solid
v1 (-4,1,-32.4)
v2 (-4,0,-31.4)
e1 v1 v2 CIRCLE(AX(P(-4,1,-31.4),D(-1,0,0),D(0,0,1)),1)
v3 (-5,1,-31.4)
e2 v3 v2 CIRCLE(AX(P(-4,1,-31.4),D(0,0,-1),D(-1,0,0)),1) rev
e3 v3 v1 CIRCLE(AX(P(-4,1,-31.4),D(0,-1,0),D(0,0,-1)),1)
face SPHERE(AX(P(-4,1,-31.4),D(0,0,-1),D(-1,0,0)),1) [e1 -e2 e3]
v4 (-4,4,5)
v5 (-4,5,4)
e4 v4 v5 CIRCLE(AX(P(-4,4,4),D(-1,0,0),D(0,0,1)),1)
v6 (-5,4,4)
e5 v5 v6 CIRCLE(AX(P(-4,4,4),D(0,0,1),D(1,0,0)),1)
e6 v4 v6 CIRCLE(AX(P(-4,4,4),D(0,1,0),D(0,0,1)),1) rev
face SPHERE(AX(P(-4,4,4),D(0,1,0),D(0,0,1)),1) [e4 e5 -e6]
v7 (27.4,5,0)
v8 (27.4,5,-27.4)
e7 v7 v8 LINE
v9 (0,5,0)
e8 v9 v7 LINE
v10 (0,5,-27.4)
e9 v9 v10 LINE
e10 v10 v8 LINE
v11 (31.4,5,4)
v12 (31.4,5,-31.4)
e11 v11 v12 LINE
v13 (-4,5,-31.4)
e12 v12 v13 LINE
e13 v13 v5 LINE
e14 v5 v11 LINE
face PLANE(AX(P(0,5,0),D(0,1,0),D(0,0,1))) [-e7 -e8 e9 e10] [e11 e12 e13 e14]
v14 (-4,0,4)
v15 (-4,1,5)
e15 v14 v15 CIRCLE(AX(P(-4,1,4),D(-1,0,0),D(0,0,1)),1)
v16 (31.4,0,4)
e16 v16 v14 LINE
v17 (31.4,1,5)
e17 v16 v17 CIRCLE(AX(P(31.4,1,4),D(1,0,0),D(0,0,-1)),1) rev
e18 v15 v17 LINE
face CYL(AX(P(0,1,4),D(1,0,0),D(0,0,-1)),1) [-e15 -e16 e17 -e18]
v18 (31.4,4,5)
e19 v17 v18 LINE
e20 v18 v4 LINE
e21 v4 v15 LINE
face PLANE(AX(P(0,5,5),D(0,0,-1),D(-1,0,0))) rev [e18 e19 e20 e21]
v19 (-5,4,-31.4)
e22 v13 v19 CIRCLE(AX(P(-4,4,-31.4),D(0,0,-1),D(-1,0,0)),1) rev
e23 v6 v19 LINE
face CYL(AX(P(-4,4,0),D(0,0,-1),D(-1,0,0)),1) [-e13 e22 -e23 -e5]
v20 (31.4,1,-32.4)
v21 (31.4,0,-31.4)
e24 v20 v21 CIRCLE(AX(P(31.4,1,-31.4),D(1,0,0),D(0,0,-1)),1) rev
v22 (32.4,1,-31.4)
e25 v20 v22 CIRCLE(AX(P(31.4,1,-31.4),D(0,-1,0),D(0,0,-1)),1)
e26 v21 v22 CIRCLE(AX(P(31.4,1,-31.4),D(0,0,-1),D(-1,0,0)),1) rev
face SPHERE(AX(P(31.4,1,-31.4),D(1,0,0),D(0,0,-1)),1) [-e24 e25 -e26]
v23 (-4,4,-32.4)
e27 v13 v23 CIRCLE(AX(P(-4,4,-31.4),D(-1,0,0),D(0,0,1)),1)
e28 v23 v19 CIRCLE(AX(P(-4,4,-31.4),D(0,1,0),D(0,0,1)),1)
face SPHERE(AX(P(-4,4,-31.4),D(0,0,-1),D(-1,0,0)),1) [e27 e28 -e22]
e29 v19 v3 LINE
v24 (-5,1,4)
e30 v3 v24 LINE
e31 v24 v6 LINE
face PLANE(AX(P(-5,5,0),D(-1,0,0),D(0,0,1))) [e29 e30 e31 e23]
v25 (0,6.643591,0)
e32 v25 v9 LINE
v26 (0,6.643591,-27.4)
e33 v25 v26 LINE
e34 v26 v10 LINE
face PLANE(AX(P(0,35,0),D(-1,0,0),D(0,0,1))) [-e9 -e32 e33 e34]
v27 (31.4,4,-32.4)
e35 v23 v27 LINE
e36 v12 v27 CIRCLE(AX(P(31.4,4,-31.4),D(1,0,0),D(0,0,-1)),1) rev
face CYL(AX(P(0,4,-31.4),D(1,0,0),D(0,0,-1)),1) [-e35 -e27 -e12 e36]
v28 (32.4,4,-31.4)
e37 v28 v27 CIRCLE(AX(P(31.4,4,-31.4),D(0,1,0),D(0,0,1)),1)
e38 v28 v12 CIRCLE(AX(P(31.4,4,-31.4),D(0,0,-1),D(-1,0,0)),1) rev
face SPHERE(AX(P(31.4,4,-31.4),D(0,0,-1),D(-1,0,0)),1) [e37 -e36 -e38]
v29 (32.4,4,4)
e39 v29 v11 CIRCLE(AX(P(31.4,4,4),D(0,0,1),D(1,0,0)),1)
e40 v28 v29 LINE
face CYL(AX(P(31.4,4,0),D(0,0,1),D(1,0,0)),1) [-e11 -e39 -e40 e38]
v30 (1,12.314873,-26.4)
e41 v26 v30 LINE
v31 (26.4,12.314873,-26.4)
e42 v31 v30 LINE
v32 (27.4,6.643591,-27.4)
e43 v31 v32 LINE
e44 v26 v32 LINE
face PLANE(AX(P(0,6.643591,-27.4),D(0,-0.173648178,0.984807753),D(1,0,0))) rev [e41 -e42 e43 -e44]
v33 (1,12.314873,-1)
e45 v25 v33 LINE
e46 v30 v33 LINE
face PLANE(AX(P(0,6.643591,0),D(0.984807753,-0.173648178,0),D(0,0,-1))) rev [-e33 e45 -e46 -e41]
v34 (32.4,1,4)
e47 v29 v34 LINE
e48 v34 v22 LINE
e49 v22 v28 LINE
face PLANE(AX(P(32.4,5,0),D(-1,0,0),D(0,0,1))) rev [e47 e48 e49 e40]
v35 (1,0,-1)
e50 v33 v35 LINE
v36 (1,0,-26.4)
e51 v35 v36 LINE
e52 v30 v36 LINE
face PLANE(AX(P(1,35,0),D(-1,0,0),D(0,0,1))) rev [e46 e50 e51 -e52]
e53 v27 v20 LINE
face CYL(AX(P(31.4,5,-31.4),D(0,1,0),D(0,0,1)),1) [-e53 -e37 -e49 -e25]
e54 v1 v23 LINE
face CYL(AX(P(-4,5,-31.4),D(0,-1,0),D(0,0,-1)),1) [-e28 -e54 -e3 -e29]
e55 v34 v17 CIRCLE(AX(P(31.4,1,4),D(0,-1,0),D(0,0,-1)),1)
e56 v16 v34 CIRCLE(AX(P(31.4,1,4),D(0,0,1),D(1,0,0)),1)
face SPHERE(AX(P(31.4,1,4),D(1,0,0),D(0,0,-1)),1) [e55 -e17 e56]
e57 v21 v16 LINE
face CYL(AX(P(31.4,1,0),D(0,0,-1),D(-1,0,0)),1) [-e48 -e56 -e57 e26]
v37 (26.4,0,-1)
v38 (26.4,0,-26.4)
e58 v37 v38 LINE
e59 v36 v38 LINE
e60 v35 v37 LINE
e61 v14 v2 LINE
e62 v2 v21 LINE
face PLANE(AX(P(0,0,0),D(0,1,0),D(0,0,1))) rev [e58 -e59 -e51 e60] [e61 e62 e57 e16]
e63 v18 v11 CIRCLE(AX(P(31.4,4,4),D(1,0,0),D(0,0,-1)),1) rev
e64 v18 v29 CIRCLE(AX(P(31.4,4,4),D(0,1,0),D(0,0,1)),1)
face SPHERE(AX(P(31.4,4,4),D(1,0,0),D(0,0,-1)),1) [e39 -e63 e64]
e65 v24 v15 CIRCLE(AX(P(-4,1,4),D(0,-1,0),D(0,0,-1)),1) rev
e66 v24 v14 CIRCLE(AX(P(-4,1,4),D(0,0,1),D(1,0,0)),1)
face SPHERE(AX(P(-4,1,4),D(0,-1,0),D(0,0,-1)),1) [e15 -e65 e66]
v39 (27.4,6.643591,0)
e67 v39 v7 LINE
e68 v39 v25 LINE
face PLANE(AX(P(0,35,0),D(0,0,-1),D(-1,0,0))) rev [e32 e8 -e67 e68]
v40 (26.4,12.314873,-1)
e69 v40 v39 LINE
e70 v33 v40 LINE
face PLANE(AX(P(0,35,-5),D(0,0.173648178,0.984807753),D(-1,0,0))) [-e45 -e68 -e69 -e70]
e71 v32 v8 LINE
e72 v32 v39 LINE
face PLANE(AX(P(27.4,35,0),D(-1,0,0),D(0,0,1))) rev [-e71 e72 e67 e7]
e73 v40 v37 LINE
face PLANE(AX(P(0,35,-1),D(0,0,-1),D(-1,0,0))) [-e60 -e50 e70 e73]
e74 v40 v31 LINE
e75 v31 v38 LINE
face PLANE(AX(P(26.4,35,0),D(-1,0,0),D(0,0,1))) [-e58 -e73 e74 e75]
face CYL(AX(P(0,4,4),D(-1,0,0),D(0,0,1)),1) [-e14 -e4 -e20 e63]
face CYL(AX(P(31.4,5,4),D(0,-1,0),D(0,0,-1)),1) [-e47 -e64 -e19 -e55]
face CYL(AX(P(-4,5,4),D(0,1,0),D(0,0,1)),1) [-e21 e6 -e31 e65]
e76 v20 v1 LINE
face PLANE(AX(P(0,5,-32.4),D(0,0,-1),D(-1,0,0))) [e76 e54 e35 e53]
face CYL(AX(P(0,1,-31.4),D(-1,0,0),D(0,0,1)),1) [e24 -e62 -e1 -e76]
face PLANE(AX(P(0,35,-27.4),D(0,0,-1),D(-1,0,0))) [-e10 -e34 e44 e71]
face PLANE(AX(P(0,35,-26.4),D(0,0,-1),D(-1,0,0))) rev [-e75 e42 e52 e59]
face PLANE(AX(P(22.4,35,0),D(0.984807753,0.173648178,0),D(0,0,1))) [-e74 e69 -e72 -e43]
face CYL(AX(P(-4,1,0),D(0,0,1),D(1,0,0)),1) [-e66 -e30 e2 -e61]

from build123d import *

# Parameters (mm, degrees)
SKETCH1_W           = 27.4
SKETCH1_H           = 27.4
SKETCH1_W_2         = 25.4
SKETCH1_H_2         = 25.4
BOSS_EXTRUDE1_DEPTH = 35
SKETCH1_3_W         = 37.4
SKETCH1_3_H         = 37.4
SKETCH1_3_W_2       = 27.4
SKETCH1_3_H_2       = 27.4
BOSS_EXTRUDE2_DEPTH = 5
CHAMFER1_SIZE       = 5
CHAMFER1_SIZE_2     = 28.356409098
FILLET1_R           = 1


with BuildPart() as part:
    # Sketch1 → Boss-Extrude1 (new body)
    with BuildSketch(Plane(origin=(0, 0, 0), x_dir=(1, 0, 0), z_dir=(0, 1, 0))):
        with Locations((13.7, 13.7)):
            Rectangle(SKETCH1_W, SKETCH1_H)
        with Locations((13.7, 13.7)):
            Rectangle(SKETCH1_W_2, SKETCH1_H_2, mode=Mode.SUBTRACT)
    extrude(amount=BOSS_EXTRUDE1_DEPTH)

    # Sketch1<3> → Boss-Extrude2 (add)
    with BuildSketch(Plane(origin=(0, 0, 0), x_dir=(1, 0, 0), z_dir=(0, 1, 0))):
        with Locations((13.7, 13.7)):
            Rectangle(SKETCH1_3_W, SKETCH1_3_H)
        with Locations((13.7, 13.7)):
            Rectangle(SKETCH1_3_W_2, SKETCH1_3_H_2, mode=Mode.SUBTRACT)
    extrude(amount=BOSS_EXTRUDE2_DEPTH)

    # Chamfer1
    # the kernel refuses this chamfer: 28.356409098, 5 mm, written as the material it takes off along each edge
    with BuildSketch(Plane(origin=(101.085229169, 35, -27.4), x_dir=(0, 0.2101387607674354, 0.9776715712462578), z_dir=(-1, 0, 0)), Plane(origin=(0, 35, -101.085229169), x_dir=(0.9776715712462578, 0.2101387607674354, 0), z_dir=(0, 0, 1))) as chamfer1_piece_1:
        Polygon((CHAMFER1_SIZE * 0.977671571246, -CHAMFER1_SIZE * 0.210138760767), (-CHAMFER1_SIZE_2 * 0.210138760768, -CHAMFER1_SIZE_2 * 0.977671571249), (0, 0), align=None)
    extrude(amount=174.770458337, mode=Mode.SUBTRACT)
    with BuildSketch(Plane(origin=(27.4, 35, 73.685229169), x_dir=(0.006682531656101585, -0.9999776716360547, 0), z_dir=(0, 0, -1)), Plane(origin=(-73.685229169, 35, 0), x_dir=(0, -0.9999776716360547, 0.006682531656101581), z_dir=(1, 0, 0))) as chamfer1_piece_2:
        Polygon((CHAMFER1_SIZE_2 * 0.999977671639, CHAMFER1_SIZE_2 * 0.00668253165612), (-CHAMFER1_SIZE * 0.0066825316561, CHAMFER1_SIZE * 0.999977671636), (0, 0), align=None)
    extrude(amount=174.770458337, mode=Mode.SUBTRACT)

    # Fillet1
    fillet1_edges = [part.edges().sort_by_distance(p)[0] for p in [
        (-5, 5, -13.7),
        (-5, 2.5, -32.4),
        (13.7, 0, 5),
        (-5, 2.5, 5),
        (32.4, 0, -13.7),
        (32.4, 2.5, 5),
        (13.7, 5, -32.4),
        (32.4, 2.5, -32.4),
        (13.7, 5, 5),
        (32.4, 5, -13.7),
        (-5, 0, -13.7),
        (13.7, 0, -32.4),
    ]]
    fillet(fillet1_edges, radius=FILLET1_R)


solid = part.part
